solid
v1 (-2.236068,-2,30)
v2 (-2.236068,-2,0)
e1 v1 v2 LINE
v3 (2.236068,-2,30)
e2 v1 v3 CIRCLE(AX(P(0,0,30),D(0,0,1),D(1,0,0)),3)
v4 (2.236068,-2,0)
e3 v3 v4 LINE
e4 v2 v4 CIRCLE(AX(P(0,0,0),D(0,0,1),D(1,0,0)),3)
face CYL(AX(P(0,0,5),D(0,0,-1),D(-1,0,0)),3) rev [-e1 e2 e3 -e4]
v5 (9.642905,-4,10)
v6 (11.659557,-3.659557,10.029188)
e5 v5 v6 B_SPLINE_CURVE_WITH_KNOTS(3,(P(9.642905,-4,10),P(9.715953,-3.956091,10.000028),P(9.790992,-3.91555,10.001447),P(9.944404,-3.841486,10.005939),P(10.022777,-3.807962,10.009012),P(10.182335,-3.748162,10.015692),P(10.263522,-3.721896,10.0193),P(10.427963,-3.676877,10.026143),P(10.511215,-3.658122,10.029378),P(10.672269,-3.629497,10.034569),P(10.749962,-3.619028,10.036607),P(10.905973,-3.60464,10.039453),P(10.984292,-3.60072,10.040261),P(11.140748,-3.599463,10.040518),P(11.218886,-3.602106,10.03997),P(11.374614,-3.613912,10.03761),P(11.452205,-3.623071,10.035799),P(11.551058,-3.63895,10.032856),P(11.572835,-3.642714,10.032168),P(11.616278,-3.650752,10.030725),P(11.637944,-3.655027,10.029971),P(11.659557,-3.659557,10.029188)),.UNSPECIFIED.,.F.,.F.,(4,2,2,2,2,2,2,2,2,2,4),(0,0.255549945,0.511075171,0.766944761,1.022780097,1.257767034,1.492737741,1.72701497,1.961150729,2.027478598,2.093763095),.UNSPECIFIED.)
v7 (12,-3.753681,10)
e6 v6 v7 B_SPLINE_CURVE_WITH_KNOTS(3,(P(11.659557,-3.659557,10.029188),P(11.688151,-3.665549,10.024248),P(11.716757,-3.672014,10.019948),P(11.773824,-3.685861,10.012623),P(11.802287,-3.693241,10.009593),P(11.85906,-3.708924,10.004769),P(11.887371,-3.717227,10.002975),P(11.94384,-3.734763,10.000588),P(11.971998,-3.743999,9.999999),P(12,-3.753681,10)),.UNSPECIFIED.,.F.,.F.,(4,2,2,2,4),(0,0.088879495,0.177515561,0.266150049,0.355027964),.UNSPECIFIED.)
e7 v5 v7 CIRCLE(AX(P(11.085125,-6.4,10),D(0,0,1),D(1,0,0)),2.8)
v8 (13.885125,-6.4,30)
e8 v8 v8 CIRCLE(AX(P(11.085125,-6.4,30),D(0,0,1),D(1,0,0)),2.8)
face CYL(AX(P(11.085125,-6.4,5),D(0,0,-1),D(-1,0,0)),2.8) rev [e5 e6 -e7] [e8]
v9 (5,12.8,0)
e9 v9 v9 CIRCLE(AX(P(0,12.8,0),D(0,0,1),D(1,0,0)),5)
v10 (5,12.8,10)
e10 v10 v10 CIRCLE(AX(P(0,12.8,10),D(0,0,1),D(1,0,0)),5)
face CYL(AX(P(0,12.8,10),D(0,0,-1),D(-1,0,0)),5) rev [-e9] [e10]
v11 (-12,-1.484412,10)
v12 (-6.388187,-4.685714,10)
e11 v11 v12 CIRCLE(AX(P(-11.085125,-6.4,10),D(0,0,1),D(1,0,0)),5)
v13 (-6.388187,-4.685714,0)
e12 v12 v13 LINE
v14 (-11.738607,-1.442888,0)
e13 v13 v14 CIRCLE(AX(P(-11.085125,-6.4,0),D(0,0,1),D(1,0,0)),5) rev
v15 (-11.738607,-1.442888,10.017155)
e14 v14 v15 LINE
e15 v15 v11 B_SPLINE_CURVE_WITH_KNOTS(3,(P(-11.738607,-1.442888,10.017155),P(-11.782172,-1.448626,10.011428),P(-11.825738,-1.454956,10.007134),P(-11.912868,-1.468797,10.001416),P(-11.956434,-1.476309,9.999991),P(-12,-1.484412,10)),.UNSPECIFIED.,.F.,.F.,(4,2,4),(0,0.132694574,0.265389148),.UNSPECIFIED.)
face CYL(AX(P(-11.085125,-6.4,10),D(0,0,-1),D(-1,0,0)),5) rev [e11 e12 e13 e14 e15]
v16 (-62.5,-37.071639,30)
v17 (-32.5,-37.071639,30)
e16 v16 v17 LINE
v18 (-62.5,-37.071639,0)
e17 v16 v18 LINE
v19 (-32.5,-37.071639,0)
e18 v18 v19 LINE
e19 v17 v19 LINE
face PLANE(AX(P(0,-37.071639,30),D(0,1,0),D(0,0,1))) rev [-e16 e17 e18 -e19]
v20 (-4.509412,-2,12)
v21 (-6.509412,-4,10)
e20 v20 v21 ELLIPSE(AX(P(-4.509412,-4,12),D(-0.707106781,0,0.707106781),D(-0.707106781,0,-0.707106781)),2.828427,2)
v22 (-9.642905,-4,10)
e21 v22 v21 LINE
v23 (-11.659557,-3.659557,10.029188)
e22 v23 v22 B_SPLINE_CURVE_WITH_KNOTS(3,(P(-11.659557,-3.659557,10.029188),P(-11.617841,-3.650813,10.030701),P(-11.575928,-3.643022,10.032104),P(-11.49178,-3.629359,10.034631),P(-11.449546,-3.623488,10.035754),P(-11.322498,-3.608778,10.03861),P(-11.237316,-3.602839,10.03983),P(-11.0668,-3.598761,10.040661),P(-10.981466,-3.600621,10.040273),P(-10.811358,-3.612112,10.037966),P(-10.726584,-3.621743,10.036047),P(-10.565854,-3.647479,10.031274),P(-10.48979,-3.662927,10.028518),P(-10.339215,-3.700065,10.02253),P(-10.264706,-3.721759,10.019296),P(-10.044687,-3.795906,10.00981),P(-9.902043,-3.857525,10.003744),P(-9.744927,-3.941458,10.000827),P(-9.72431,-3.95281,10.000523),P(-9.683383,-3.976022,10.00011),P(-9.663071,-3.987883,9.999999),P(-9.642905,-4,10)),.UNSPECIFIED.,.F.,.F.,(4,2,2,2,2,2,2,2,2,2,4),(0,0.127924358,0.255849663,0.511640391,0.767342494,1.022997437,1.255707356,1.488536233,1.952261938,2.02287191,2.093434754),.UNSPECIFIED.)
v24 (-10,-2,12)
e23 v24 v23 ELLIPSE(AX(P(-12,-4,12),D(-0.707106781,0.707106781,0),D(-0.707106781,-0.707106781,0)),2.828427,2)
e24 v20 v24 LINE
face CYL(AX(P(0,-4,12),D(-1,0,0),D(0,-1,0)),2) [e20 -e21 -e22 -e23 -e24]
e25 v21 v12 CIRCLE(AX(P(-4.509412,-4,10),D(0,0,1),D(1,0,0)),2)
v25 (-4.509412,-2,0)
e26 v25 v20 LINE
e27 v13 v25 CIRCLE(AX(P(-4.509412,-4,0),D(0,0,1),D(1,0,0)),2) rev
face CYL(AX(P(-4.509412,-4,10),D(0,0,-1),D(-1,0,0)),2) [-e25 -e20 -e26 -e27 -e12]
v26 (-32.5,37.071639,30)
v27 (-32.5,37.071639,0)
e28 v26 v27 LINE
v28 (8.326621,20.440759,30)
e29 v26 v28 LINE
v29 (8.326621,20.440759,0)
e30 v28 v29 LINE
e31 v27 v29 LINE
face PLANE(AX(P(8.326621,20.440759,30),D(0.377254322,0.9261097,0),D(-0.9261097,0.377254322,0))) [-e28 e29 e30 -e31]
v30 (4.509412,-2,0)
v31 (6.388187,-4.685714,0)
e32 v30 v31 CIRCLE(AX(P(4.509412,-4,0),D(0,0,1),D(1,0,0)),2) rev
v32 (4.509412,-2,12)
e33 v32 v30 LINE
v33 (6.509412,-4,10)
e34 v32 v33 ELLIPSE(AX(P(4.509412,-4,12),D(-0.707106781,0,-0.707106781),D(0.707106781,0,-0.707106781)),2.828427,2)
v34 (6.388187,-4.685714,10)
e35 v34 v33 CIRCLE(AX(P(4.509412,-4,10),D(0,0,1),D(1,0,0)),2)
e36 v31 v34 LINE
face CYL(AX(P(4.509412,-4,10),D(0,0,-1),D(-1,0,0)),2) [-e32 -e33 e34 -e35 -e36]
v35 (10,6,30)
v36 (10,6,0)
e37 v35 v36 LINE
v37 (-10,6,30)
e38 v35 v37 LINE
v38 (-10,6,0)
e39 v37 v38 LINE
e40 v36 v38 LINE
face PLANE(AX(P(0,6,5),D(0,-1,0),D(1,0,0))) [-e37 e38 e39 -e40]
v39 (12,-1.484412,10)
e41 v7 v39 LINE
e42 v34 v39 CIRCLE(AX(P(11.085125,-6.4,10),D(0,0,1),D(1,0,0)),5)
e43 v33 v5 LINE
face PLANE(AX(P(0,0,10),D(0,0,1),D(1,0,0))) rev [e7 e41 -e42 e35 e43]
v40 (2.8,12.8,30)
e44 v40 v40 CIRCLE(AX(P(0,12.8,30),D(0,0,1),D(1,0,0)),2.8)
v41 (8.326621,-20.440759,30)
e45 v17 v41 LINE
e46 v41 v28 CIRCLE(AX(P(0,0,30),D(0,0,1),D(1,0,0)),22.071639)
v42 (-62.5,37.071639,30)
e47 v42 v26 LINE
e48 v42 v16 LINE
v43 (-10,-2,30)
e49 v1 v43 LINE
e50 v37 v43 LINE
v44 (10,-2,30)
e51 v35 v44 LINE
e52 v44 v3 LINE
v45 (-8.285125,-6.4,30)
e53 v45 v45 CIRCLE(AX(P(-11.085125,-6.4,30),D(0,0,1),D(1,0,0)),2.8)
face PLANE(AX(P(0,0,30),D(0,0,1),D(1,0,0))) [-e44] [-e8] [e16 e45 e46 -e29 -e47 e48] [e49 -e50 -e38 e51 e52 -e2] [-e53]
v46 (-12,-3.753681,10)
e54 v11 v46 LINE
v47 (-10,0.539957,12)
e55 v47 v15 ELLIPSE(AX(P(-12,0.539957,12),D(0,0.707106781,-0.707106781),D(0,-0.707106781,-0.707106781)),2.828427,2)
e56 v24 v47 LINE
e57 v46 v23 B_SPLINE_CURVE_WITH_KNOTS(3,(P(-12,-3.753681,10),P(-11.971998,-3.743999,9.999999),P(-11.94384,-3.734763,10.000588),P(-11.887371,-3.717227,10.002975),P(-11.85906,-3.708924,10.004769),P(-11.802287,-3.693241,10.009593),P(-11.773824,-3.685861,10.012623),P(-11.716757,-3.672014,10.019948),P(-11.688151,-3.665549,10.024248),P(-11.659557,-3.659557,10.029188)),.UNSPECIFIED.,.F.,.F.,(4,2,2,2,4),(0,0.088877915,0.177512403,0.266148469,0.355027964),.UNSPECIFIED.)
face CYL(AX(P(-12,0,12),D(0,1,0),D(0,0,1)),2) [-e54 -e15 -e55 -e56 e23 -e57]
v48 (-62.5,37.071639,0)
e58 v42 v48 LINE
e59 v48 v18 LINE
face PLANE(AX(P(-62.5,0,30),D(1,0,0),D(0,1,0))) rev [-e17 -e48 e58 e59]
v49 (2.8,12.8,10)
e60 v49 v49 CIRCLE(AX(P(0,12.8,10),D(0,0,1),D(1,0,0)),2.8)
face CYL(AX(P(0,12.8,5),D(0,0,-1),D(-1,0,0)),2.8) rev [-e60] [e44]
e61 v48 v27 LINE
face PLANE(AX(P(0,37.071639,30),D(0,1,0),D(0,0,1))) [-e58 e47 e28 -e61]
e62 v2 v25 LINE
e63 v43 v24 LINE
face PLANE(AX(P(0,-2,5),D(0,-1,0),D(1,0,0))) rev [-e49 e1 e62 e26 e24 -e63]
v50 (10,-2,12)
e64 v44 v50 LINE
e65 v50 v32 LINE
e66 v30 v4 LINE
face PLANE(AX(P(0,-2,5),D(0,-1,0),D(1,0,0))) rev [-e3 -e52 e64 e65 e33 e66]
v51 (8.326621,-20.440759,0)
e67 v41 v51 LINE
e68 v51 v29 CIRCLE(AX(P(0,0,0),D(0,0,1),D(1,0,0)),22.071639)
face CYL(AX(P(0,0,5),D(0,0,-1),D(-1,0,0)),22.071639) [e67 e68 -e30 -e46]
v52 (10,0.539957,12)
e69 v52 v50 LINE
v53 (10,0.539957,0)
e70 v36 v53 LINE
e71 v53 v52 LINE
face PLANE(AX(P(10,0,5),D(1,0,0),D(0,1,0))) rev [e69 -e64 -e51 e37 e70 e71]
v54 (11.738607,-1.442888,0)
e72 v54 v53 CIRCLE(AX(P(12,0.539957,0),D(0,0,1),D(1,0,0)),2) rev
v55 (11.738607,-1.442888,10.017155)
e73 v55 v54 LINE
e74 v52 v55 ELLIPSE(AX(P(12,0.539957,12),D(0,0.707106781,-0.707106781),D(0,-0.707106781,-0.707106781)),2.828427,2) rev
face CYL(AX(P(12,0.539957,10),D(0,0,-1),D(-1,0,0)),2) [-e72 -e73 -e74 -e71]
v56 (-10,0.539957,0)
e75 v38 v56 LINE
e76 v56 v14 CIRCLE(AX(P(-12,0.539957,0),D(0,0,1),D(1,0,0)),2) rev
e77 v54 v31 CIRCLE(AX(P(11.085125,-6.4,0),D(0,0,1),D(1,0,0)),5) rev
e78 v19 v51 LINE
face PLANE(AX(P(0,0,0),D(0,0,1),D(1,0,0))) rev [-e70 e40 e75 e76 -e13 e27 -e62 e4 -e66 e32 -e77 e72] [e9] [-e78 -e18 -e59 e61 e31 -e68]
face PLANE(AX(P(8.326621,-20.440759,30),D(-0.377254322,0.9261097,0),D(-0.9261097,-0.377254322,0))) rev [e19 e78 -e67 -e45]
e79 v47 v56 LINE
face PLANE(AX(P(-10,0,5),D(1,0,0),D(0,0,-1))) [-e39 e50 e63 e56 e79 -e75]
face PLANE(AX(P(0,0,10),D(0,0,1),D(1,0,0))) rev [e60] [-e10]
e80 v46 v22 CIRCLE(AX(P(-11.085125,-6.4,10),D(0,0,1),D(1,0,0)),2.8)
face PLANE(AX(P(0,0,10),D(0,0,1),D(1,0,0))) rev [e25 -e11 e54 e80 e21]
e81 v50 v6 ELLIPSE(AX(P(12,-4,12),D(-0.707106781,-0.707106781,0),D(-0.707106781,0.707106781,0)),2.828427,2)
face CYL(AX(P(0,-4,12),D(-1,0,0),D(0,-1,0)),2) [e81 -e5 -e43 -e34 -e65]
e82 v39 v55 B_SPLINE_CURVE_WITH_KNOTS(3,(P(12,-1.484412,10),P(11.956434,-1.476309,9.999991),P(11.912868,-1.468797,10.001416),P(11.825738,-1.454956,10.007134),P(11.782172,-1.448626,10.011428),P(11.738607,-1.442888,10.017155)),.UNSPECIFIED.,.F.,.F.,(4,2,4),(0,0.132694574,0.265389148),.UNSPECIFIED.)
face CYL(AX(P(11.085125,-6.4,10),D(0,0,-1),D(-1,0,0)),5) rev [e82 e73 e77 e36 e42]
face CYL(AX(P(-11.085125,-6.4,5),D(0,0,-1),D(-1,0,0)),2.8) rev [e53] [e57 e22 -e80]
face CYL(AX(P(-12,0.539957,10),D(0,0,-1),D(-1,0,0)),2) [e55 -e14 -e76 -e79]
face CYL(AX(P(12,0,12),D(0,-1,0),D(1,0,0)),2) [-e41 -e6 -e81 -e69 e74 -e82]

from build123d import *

# Parameters (mm, degrees)
SKETCH_1_R          = 22.07163906423819
SKETCH_1_R_2        = 2.8
SKETCH_1_R_3        = 2.8000000000000003
EXTRUDE_1_DEPTH     = 5
SKETCH_2_R          = 22.07163906423819
SKETCH_2_R_2        = 2.8000000000000003
SKETCH_2_R_3        = 2.8
EXTRUDE_2_DEPTH     = 30
SKETCH_3_R          = 4.999999999999998
SKETCH_3_R_2        = 2.8000000000000003
SKETCH_3_R_3        = 5.000000000000001
SKETCH_3_R_4        = 2.8
SKETCH_3_R_5        = 5
CUT_EXTRUDE_1_DEPTH = 10
FILLET_2_R          = 2
FILLET_3_R          = 2


with BuildPart() as part:
    # 스케치1 → 보스-돌출1 (new body)
    with BuildSketch(Plane.XY):
        Circle(SKETCH_1_R)
        with Locations((0, 12.8)):
            Circle(SKETCH_1_R_2, mode=Mode.SUBTRACT)
        with Locations((-11.085125168440811, -6.400000000000006)):
            Circle(SKETCH_1_R_3, mode=Mode.SUBTRACT)
        with Locations((11.085125168440817, -6.399999999999997)):
            Circle(SKETCH_1_R_3, mode=Mode.SUBTRACT)
        with BuildLine():
            Line((-9.999999999999998, 5.9999999999999964), (10.000000000000002, 6.0000000000000036))
            Line((10.000000000000002, 6.0000000000000036), (10.000000000000004, -1.9999999999999964))
            Line((10.000000000000004, -1.9999999999999973), (2.236067977499654, -1.9999999999999998))
            ThreePointArc((2.236067977499691, -2.00000000000011), (-3.785e-14, -3), (-2.2360679774997423, -2.000000000000053))
            Line((-2.236067977499724, -2.0000000000000013), (-9.999999999999996, -2.0000000000000036))
            Line((-9.999999999999996, -2.0000000000000036), (-9.999999999999996, 5.9999999999999964))
        make_face(mode=Mode.SUBTRACT)
    extrude(amount=EXTRUDE_1_DEPTH)

    # 스케치2 → 보스-돌출2 (add)
    # profile 1 of 4: a face of its own
    with BuildSketch(Plane.XY):
        with BuildLine():
            ThreePointArc((8.32662123293451, -20.440759032512698), (4.242416494011306, -21.660082023698482), (-4.05e-15, -22.07163906423819))
            Line((0, -22.07163906423819), (-62.49999999999999, -22.07163906423819))
            Line((-62.49999999999999, -22.07163906423819), (-62.499999999999986, -37.07163906423819))
            Line((-62.499999999999986, -37.07163906423819), (-32.5, -37.07163906423819))
            Line((-32.5, -37.07163906423819), (8.326621232934514, -20.440759032512695))
        make_face()
    # profile 2 of 4: a face of its own
    with BuildSketch(Plane.XY):
        with BuildLine():
            ThreePointArc((-4.05e-15, -22.07163906423819), (-22.07163906423819, 2.7e-15), (1.35e-15, 22.07163906423819))
            Line((0, 22.07163906423819), (-62.49999999999999, 22.07163906423819))
            Line((-62.49999999999999, 22.07163906423819), (-62.49999999999999, -22.07163906423819))
            Line((-62.49999999999999, -22.07163906423819), (0, -22.07163906423819))
        make_face()
    # profile 3 of 4: a face of its own
    with BuildSketch(Plane.XY):
        Circle(SKETCH_2_R)
        with Locations((11.085125168440817, -6.399999999999997)):
            Circle(SKETCH_2_R_2, mode=Mode.SUBTRACT)
        with Locations((-11.085125168440811, -6.400000000000006)):
            Circle(SKETCH_2_R_2, mode=Mode.SUBTRACT)
        with Locations((0, 12.8)):
            Circle(SKETCH_2_R_3, mode=Mode.SUBTRACT)
        with BuildLine():
            ThreePointArc((-2.23606797749979, -2.0000000000000013), (8.5e-16, -3.000000000000001), (2.2360679774997907, -1.9999999999999996))
            Line((2.2360679774997907, -1.9999999999999996), (10.000000000000004, -1.9999999999999973))
            Line((10.000000000000004, -1.9999999999999973), (10.000000000000002, 6.0000000000000036))
            Line((10.000000000000002, 6.0000000000000036), (-9.999999999999996, 5.9999999999999964))
            Line((-9.999999999999996, 5.9999999999999964), (-9.999999999999996, -2.0000000000000036))
            Line((-9.999999999999996, -2.0000000000000036), (-2.23606797749979, -2.0000000000000013))
        make_face(mode=Mode.SUBTRACT)
    # profile 4 of 4: a face of its own
    with BuildSketch(Plane.XY):
        with BuildLine():
            Line((-62.49999999999999, 22.07163906423819), (0, 22.07163906423819))
            ThreePointArc((1.35e-15, 22.07163906423819), (4.242416494011311, 21.660082023698482), (8.326621232934516, 20.440759032512698))
            Line((8.326621232934514, 20.440759032512695), (-32.500000000000014, 37.07163906423818))
            Line((-32.500000000000014, 37.07163906423818), (-62.5, 37.07163906423818))
            Line((-62.5, 37.07163906423818), (-62.49999999999999, 22.07163906423819))
        make_face()
    extrude(amount=EXTRUDE_2_DEPTH)

    # 스케치3 → 컷-돌출1 (cut)
    # profile 1 of 3: a face of its own
    with BuildSketch(Plane.XY):
        with Locations((11.085125168440817, -6.399999999999997)):
            Circle(SKETCH_3_R)
        with Locations((11.085125168440817, -6.399999999999997)):
            Circle(SKETCH_3_R_2, mode=Mode.SUBTRACT)
    # profile 2 of 3: a face of its own
    with BuildSketch(Plane.XY):
        with Locations((0, 12.8)):
            Circle(SKETCH_3_R_3)
        with Locations((0, 12.8)):
            Circle(SKETCH_3_R_4, mode=Mode.SUBTRACT)
    # profile 3 of 3: a face of its own
    with BuildSketch(Plane.XY):
        with Locations((-11.085125168440811, -6.400000000000006)):
            Circle(SKETCH_3_R_5)
        with Locations((-11.085125168440811, -6.400000000000006)):
            Circle(SKETCH_3_R_2, mode=Mode.SUBTRACT)
    extrude(amount=CUT_EXTRUDE_1_DEPTH, mode=Mode.SUBTRACT)

    # 필렛2
    # the kernel refuses this fillet: 2 mm, written as the material it takes off along each edge
    with BuildSketch(Plane(origin=(10.000000000000004, -1.9999999999999971, 10), x_dir=(0, -1.1e-16, 1), z_dir=(-1, -3.1e-16, 0))) as fillet_2_piece_1_section:
        with BuildLine():
            CenterArc((FILLET_2_R, -FILLET_2_R), FILLET_2_R, 90, 90)
            Line((2.2e-16, -FILLET_2_R), (-FILLET_2_R * 0.02, -FILLET_2_R))
            Line((-FILLET_2_R * 0.02, -FILLET_2_R), (-FILLET_2_R * 0.02, FILLET_2_R * 0.02))
            Line((-FILLET_2_R * 0.02, FILLET_2_R * 0.02), (FILLET_2_R, FILLET_2_R * 0.02))
            Line((FILLET_2_R, FILLET_2_R * 0.02), (FILLET_2_R, 0))
        make_face()
    fillet_2_piece_1 = extrude(amount=6.289743248966767, mode=Mode.PRIVATE)
    fillet_2_piece_1 = fillet_2_piece_1 & Plane(origin=(11.085125168440817, -6.399999999999997, 10.38158038345629), x_dir=(1, 0, 0), z_dir=(0, 0, -1)) * Cylinder(4.999999999999998, 21, mode=Mode.PRIVATE)
    add(fillet_2_piece_1, mode=Mode.SUBTRACT)
    with BuildSketch(Plane(origin=(10.000000000000002, 3.4808301925816174, 10), x_dir=(1, 2.2e-16, 0), z_dir=(2.2e-16, -1, 0))) as fillet_2_piece_2_section:
        with BuildLine():
            CenterArc((FILLET_2_R, FILLET_2_R), FILLET_2_R, 180, 90)
            Line((0, FILLET_2_R), (-FILLET_2_R * 0.02, FILLET_2_R))
            Line((-FILLET_2_R * 0.02, FILLET_2_R), (-FILLET_2_R * 0.02, -FILLET_2_R * 0.02))
            Line((-FILLET_2_R * 0.02, -FILLET_2_R * 0.02), (FILLET_2_R, -FILLET_2_R * 0.02))
            Line((FILLET_2_R, -FILLET_2_R * 0.02), (FILLET_2_R, 0))
        make_face()
    fillet_2_piece_2 = extrude(amount=5.480830192581614, mode=Mode.PRIVATE)
    fillet_2_piece_2 = fillet_2_piece_2 & Plane(origin=(11.085125168440817, -6.399999999999997, 10.432374541535312), x_dir=(1, 0, 0), z_dir=(0, 0, -1)) * Cylinder(4.999999999999998, 19, mode=Mode.PRIVATE)
    add(fillet_2_piece_2, mode=Mode.SUBTRACT)
    with BuildSketch(Plane(origin=(10.000000000000004, -1.5191698074183817, 10), x_dir=(0.9990388643678791, 0.04383317787405267, 0), z_dir=(0, 0, -1))) as fillet_2_piece_3:
        with BuildLine():
            CenterArc((2.088335803131926, -1.9694814149172293), FILLET_2_R, 100.02209773137437, 82.49016328956924)
            Line((0.09025807439617, -2.057147770665381), (0.05029651982145572, -2.058901097780344))
            Line((0.05029651982145572, -2.058901097780344), (-0.03996155457471431, -0.00175332711496207))
            Line((-0.03996155457471431, -0.00175332711496207), (0.0069611193437724, 0.03938962829834457))
            ThreePointArc((0.0069611193437724, 0.03938962829834457), (0.8701399179716347, -0.03629646270692696), (1.733318716599498, 0.0393896282983446))
            Line((1.733318716599498, 0.0393896282983446), (1.7402798359432718, 0))
        make_face()
    extrude(amount=10, mode=Mode.SUBTRACT)
    with BuildSketch(Plane(origin=(8.710256751033235, -1.9999999999999971, 10), x_dir=(-1, -4.8e-16, 0), z_dir=(0, 0, -1))) as fillet_2_piece_4:
        with BuildLine():
            CenterArc((4.200844471701857, -1.9999999999999998), FILLET_2_R, 90, 110.05104256650594)
            Line((2.3220693605277325, -2.685714285714287), (2.28449385830425, -2.699428571428572))
            ThreePointArc((2.28449385830425, -2.699428571428572), (1.377184031846625, -1.1559743499710886), (-0.01899894733926109, -0.0351999999999999))
            Line((-0.01899894733926109, -0.0351999999999999), (-2e-17, 0.04000000000000004))
            Line((-2e-17, 0.04000000000000004), (4.200844471701857, 0.04000000000000004))
            Line((4.200844471701857, 0.04000000000000004), (4.200844471701857, 0))
        make_face()
    extrude(amount=10, mode=Mode.SUBTRACT)
    with BuildSketch(Plane(origin=(15.000000000000004, -1.9999999999999958, 10), x_dir=(0, 1.1e-16, 1), z_dir=(-1, -3.1e-16, 0))) as fillet_2_piece_5a_section:
        with BuildLine():
            CenterArc((FILLET_2_R, -FILLET_2_R), FILLET_2_R, 90, 90)
            Line((-2.2e-16, -FILLET_2_R), (-FILLET_2_R * 0.02, -FILLET_2_R))
            Line((-FILLET_2_R * 0.02, -FILLET_2_R), (-FILLET_2_R * 0.02, FILLET_2_R * 0.02))
            Line((-FILLET_2_R * 0.02, FILLET_2_R * 0.02), (FILLET_2_R, FILLET_2_R * 0.02))
            Line((FILLET_2_R, FILLET_2_R * 0.02), (FILLET_2_R, 0))
        make_face()
    fillet_2_piece_5a = extrude(amount=11.289743248966767, mode=Mode.PRIVATE)
    fillet_2_piece_5a = split(fillet_2_piece_5a, bisect_by=Plane(origin=(10.000000000000004, -2.502531092165931, 10.420578352743194), z_dir=(1, 2.2e-16, 0)), keep=Keep.TOP, mode=Mode.PRIVATE)
    fillet_2_piece_5a = fillet_2_piece_5a & Plane(origin=(11.085125168440817, -6.399999999999997, 10.420578352743194), x_dir=(1, 0, 0), z_dir=(0, 0, -1)) * Cylinder(4.999999999999998, 31, mode=Mode.PRIVATE)
    with BuildSketch(Plane(origin=(10.000000000000002, 3.4808301925816174, 10), x_dir=(1, 2.2e-16, 0), z_dir=(2.2e-16, -1, 0))) as fillet_2_piece_5b_section:
        with BuildLine():
            CenterArc((FILLET_2_R, FILLET_2_R), FILLET_2_R, 180, 90)
            Line((0, FILLET_2_R), (-FILLET_2_R * 0.02, FILLET_2_R))
            Line((-FILLET_2_R * 0.02, FILLET_2_R), (-FILLET_2_R * 0.02, -FILLET_2_R * 0.02))
            Line((-FILLET_2_R * 0.02, -FILLET_2_R * 0.02), (FILLET_2_R, -FILLET_2_R * 0.02))
            Line((FILLET_2_R, -FILLET_2_R * 0.02), (FILLET_2_R, 0))
        make_face()
    fillet_2_piece_5b = extrude(amount=10.480830192581614, mode=Mode.PRIVATE)
    fillet_2_piece_5b = split(fillet_2_piece_5b, bisect_by=Plane(origin=(10.452790228533653, -1.9999999999999971, 10.452790228533651), z_dir=(3.1e-16, -1, 0)), keep=Keep.TOP, mode=Mode.PRIVATE)
    fillet_2_piece_5 = fillet_2_piece_5a & fillet_2_piece_5b
    add(fillet_2_piece_5, mode=Mode.SUBTRACT)
    with BuildSketch(Plane(origin=(10.000000000000004, -1.9999999999999971, 10), x_dir=(0, -1.1e-16, 1), z_dir=(-1, -3.1e-16, 0))) as fillet_2_piece_6a_section:
        with BuildLine():
            CenterArc((FILLET_2_R, -FILLET_2_R), FILLET_2_R, 90, 90)
            Line((2.2e-16, -FILLET_2_R), (-FILLET_2_R * 0.02, -FILLET_2_R))
            Line((-FILLET_2_R * 0.02, -FILLET_2_R), (-FILLET_2_R * 0.02, FILLET_2_R * 0.02))
            Line((-FILLET_2_R * 0.02, FILLET_2_R * 0.02), (FILLET_2_R, FILLET_2_R * 0.02))
            Line((FILLET_2_R, FILLET_2_R * 0.02), (FILLET_2_R, 0))
        make_face()
    fillet_2_piece_6a = extrude(amount=6.289743248966767, mode=Mode.PRIVATE)
    fillet_2_piece_6a = fillet_2_piece_6a - Plane(origin=(11.085125168440817, -6.399999999999997, 10.483868108207538), x_dir=(1, 0, 0), z_dir=(0, 0, -1)) * Cylinder(4.999999999999998, 21, mode=Mode.PRIVATE)
    with BuildSketch(Plane(origin=(8.710256751033235, -1.9999999999999978, 20.50211117925464), x_dir=(-1, -3.2e-16, 0), z_dir=(0, 0, -1))) as fillet_2_piece_6b_section:
        with BuildLine():
            CenterArc((4.200844471701857, -2), FILLET_2_R, 90, 110.05104256650594)
            Line((2.322069360527732, -2.6857142857142864), (2.2844938583042493, -2.6994285714285717))
            ThreePointArc((2.2844938583042493, -2.6994285714285717), (1.377184031846625, -1.1559743499710882), (-0.0189989473392611, -0.03520000000000013))
            Line((-0.0189989473392611, -0.03520000000000013), (-1e-17, 0.04000000000000004))
            Line((-1e-17, 0.04000000000000004), (4.200844471701857, 0.04000000000000004))
            Line((4.200844471701857, 0.04000000000000004), (4.200844471701857, 0))
        make_face()
    fillet_2_piece_6b = extrude(amount=20.50211117925464, mode=Mode.PRIVATE)
    fillet_2_piece_6b = split(fillet_2_piece_6b, bisect_by=Plane(origin=(6.847484840256227, -2.622929884274402, 10), z_dir=(0, 0, 1)), keep=Keep.TOP, mode=Mode.PRIVATE)
    fillet_2_piece_6 = fillet_2_piece_6a & fillet_2_piece_6b
    add(fillet_2_piece_6, mode=Mode.SUBTRACT)
    with BuildSketch(Plane(origin=(10.000000000000004, -1.5191698074183826, 15.147817177180084), x_dir=(0.9990388643678791, 0.043833177874053185, 0), z_dir=(0, 0, -1))) as fillet_2_piece_7a_section:
        with BuildLine():
            CenterArc((2.0883358031319275, -1.969481414917229), FILLET_2_R, 100.02209773137442, 82.49016328956924)
            Line((0.09025807439617109, -2.057147770665382), (0.05029651982145682, -2.058901097780345))
            Line((0.05029651982145682, -2.058901097780345), (-0.03996155457471431, -0.00175332711496209))
            Line((-0.03996155457471431, -0.00175332711496209), (0.00696111934377238, 0.03938962829834458))
            ThreePointArc((0.00696111934377238, 0.03938962829834458), (0.8701399179716348, -0.03629646270692741), (1.7333187165994983, 0.0393896282983446))
            Line((1.7333187165994983, 0.0393896282983446), (1.7402798359432718, 0))
        make_face()
    fillet_2_piece_7a = extrude(amount=15.147817177180084, mode=Mode.PRIVATE)
    fillet_2_piece_7a = split(fillet_2_piece_7a, bisect_by=Plane(origin=(10.391792532024441, -0.9771675464374212, 10), z_dir=(0, 0, 1)), keep=Keep.TOP, mode=Mode.PRIVATE)
    with BuildSketch(Plane(origin=(10.000000000000002, 3.4808301925816174, 10), x_dir=(1, 2.2e-16, 0), z_dir=(2.2e-16, -1, 0))) as fillet_2_piece_7b_section:
        with BuildLine():
            CenterArc((FILLET_2_R, FILLET_2_R), FILLET_2_R, 180, 90)
            Line((0, FILLET_2_R), (-FILLET_2_R * 0.02, FILLET_2_R))
            Line((-FILLET_2_R * 0.02, FILLET_2_R), (-FILLET_2_R * 0.02, -FILLET_2_R * 0.02))
            Line((-FILLET_2_R * 0.02, -FILLET_2_R * 0.02), (FILLET_2_R, -FILLET_2_R * 0.02))
            Line((FILLET_2_R, -FILLET_2_R * 0.02), (FILLET_2_R, 0))
        make_face()
    fillet_2_piece_7b = extrude(amount=5.480830192581614, mode=Mode.PRIVATE)
    fillet_2_piece_7b = fillet_2_piece_7b - Plane(origin=(11.085125168440817, -6.399999999999997, 10.455025581015375), x_dir=(1, 0, 0), z_dir=(0, 0, -1)) * Cylinder(4.999999999999998, 19, mode=Mode.PRIVATE)
    fillet_2_piece_7 = fillet_2_piece_7a & fillet_2_piece_7b
    add(fillet_2_piece_7, mode=Mode.SUBTRACT)

    # 필렛3
    # the kernel refuses this fillet: 2 mm, written as the material it takes off along each edge
    with BuildSketch(Plane(origin=(-3.7102567510332314, -2.0000000000000018, 10), x_dir=(2.9e-16, -1, 0), z_dir=(-1, -2.9e-16, 0))) as fillet_3_piece_1_section:
        with BuildLine():
            CenterArc((FILLET_3_R, FILLET_3_R), FILLET_3_R, 180, 90)
            Line((0, FILLET_3_R), (-FILLET_3_R * 0.02, FILLET_3_R))
            Line((-FILLET_3_R * 0.02, FILLET_3_R), (-FILLET_3_R * 0.02, -FILLET_3_R * 0.02))
            Line((-FILLET_3_R * 0.02, -FILLET_3_R * 0.02), (FILLET_3_R, -FILLET_3_R * 0.02))
            Line((FILLET_3_R, -FILLET_3_R * 0.02), (FILLET_3_R, 0))
        make_face()
    fillet_3_piece_1 = extrude(amount=6.289743248966765, mode=Mode.PRIVATE)
    fillet_3_piece_1 = fillet_3_piece_1 & Plane(origin=(-11.085125168440811, -6.400000000000006, 10.381589776763924), x_dir=(1, 0, 0), z_dir=(0, 0, -1)) * Cylinder(5, 21, mode=Mode.PRIVATE)
    add(fillet_3_piece_1, mode=Mode.SUBTRACT)
    with BuildSketch(Plane(origin=(-9.999999999999996, -1.5191698074183897, 10), x_dir=(0, 1, 0), z_dir=(0, 0, -1))) as fillet_3_piece_2:
        with BuildLine():
            CenterArc((2.05912687087204, -2), FILLET_3_R, 90, 82.49016328956796)
            Line((0.07628199559958171, -1.7386071909830925), (0.0366250980941325, -1.7333793348027537))
            ThreePointArc((0.0366250980941325, -1.7333793348027537), (0.07440257468306455, -0.8677126061855152), (-0.03904664154065296, -0.00868100134752581))
            Line((-0.03904664154065296, -0.00868100134752581), (0, 0.03999999999999915))
            Line((0, 0.03999999999999915), (2.05912687087204, 0.03999999999999915))
            Line((2.05912687087204, 0.03999999999999915), (2.05912687087204, 0))
        make_face()
    extrude(amount=10, mode=Mode.SUBTRACT)
    with BuildSketch(Plane(origin=(-8.710256751033231, -2.0000000000000036, 10), x_dir=(0.6540374294413133, -0.7564621873496382, 0), z_dir=(0, 0, -1))) as fillet_3_piece_3:
        with BuildLine():
            CenterArc((4.260433894453909, -1.8697051388965966), FILLET_3_R, 110.79566042858305, 110.05104256650594)
            Line((2.747509519754633, -3.1777799977792234), (2.7172510322606476, -3.203941494956876))
            Line((2.7172510322606476, -3.203941494956876), (-0.03025848749398555, -0.02616149717765255))
            Line((-0.03025848749398555, -0.02616149717765255), (0.01420144631484614, 0.03739410277793235))
            ThreePointArc((0.01420144631484614, 0.03739410277793235), (1.775180789355795, -0.28573715275850864), (3.5361601323967444, 0.03739410277793173))
            Line((3.5361601323967444, 0.03739410277793173), (3.550361578711591, 3e-17))
        make_face()
    extrude(amount=10, mode=Mode.SUBTRACT)
    with BuildSketch(Plane(origin=(-9.999999999999996, -2.0000000000000036, 10), x_dir=(0, 0, 1), z_dir=(0, 1, 0))) as fillet_3_piece_4_section:
        with BuildLine():
            CenterArc((FILLET_3_R, -FILLET_3_R), FILLET_3_R, 90, 90)
            Line((0, -FILLET_3_R), (-FILLET_3_R * 0.02, -FILLET_3_R))
            Line((-FILLET_3_R * 0.02, -FILLET_3_R), (-FILLET_3_R * 0.02, FILLET_3_R * 0.02))
            Line((-FILLET_3_R * 0.02, FILLET_3_R * 0.02), (FILLET_3_R, FILLET_3_R * 0.02))
            Line((FILLET_3_R, FILLET_3_R * 0.02), (FILLET_3_R, 0))
        make_face()
    fillet_3_piece_4 = extrude(amount=5.480830192581614, mode=Mode.PRIVATE)
    fillet_3_piece_4 = fillet_3_piece_4 & Plane(origin=(-11.085125168440811, -6.400000000000006, 10.43237487449388), x_dir=(1, 0, 0), z_dir=(0, 0, -1)) * Cylinder(5, 19, mode=Mode.PRIVATE)
    add(fillet_3_piece_4, mode=Mode.SUBTRACT)
    with BuildSketch(Plane(origin=(-8.710256751033231, -2.0000000000000036, 20.50211117925464), x_dir=(0.6540374294413133, -0.7564621873496382, 0), z_dir=(0, 0, -1))) as fillet_3_piece_5a_section:
        with BuildLine():
            CenterArc((4.260433894453909, -1.8697051388965966), FILLET_3_R, 110.79566042858305, 110.05104256650594)
            Line((2.747509519754633, -3.1777799977792234), (2.7172510322606476, -3.203941494956876))
            Line((2.7172510322606476, -3.203941494956876), (-0.03025848749398555, -0.02616149717765255))
            Line((-0.03025848749398555, -0.02616149717765255), (0.01420144631484614, 0.03739410277793235))
            ThreePointArc((0.01420144631484614, 0.03739410277793235), (1.775180789355795, -0.28573715275850864), (3.5361601323967444, 0.03739410277793173))
            Line((3.5361601323967444, 0.03739410277793173), (3.550361578711591, 3e-17))
        make_face()
    fillet_3_piece_5a = extrude(amount=20.50211117925464, mode=Mode.PRIVATE)
    fillet_3_piece_5a = split(fillet_3_piece_5a, bisect_by=Plane(origin=(-6.847484840256223, -2.622929884274406, 10), z_dir=(0, 0, 1)), keep=Keep.TOP, mode=Mode.PRIVATE)
    with BuildSketch(Plane(origin=(-3.7102567510332314, -2.0000000000000018, 10), x_dir=(2.9e-16, -1, 0), z_dir=(-1, -2.9e-16, 0))) as fillet_3_piece_5b_section:
        with BuildLine():
            CenterArc((FILLET_3_R, FILLET_3_R), FILLET_3_R, 180, 90)
            Line((0, FILLET_3_R), (-FILLET_3_R * 0.02, FILLET_3_R))
            Line((-FILLET_3_R * 0.02, FILLET_3_R), (-FILLET_3_R * 0.02, -FILLET_3_R * 0.02))
            Line((-FILLET_3_R * 0.02, -FILLET_3_R * 0.02), (FILLET_3_R, -FILLET_3_R * 0.02))
            Line((FILLET_3_R, -FILLET_3_R * 0.02), (FILLET_3_R, 0))
        make_face()
    fillet_3_piece_5b = extrude(amount=6.289743248966765, mode=Mode.PRIVATE)
    fillet_3_piece_5b = fillet_3_piece_5b - Plane(origin=(-11.085125168440811, -6.400000000000006, 10.483871552130461), x_dir=(1, 0, 0), z_dir=(0, 0, -1)) * Cylinder(5, 21, mode=Mode.PRIVATE)
    fillet_3_piece_5 = fillet_3_piece_5a & fillet_3_piece_5b
    add(fillet_3_piece_5, mode=Mode.SUBTRACT)
    with BuildSketch(Plane(origin=(-9.999999999999996, -7.0000000000000036, 10), x_dir=(0, 0, 1), z_dir=(0, 1, 0))) as fillet_3_piece_6a_section:
        with BuildLine():
            CenterArc((FILLET_3_R, -FILLET_3_R), FILLET_3_R, 90, 90)
            Line((0, -FILLET_3_R), (-FILLET_3_R * 0.02, -FILLET_3_R))
            Line((-FILLET_3_R * 0.02, -FILLET_3_R), (-FILLET_3_R * 0.02, FILLET_3_R * 0.02))
            Line((-FILLET_3_R * 0.02, FILLET_3_R * 0.02), (FILLET_3_R, FILLET_3_R * 0.02))
            Line((FILLET_3_R, FILLET_3_R * 0.02), (FILLET_3_R, 0))
        make_face()
    fillet_3_piece_6a = extrude(amount=10.480830192581614, mode=Mode.PRIVATE)
    fillet_3_piece_6a = split(fillet_3_piece_6a, bisect_by=Plane(origin=(-10.45279022853365, -2.0000000000000036, 10.452790228533653), z_dir=(2.9e-16, -1, 0)), keep=Keep.TOP, mode=Mode.PRIVATE)
    with BuildSketch(Plane(origin=(-3.7102567510332314, -2.0000000000000018, 10), x_dir=(2.9e-16, -1, 0), z_dir=(-1, -2.9e-16, 0))) as fillet_3_piece_6b_section:
        with BuildLine():
            CenterArc((FILLET_3_R, FILLET_3_R), FILLET_3_R, 180, 90)
            Line((0, FILLET_3_R), (-FILLET_3_R * 0.02, FILLET_3_R))
            Line((-FILLET_3_R * 0.02, FILLET_3_R), (-FILLET_3_R * 0.02, -FILLET_3_R * 0.02))
            Line((-FILLET_3_R * 0.02, -FILLET_3_R * 0.02), (FILLET_3_R, -FILLET_3_R * 0.02))
            Line((FILLET_3_R, -FILLET_3_R * 0.02), (FILLET_3_R, 0))
        make_face()
    fillet_3_piece_6b = extrude(amount=11.289743248966765, mode=Mode.PRIVATE)
    fillet_3_piece_6b = split(fillet_3_piece_6b, bisect_by=Plane(origin=(-9.999999999999996, -2.5025307306861846, 10.420575876656605), z_dir=(-1, 0, 0)), keep=Keep.TOP, mode=Mode.PRIVATE)
    fillet_3_piece_6b = fillet_3_piece_6b & Plane(origin=(-11.085125168440811, -6.400000000000006, 10.420575876656605), x_dir=(1, 0, 0), z_dir=(0, 0, -1)) * Cylinder(5, 31, mode=Mode.PRIVATE)
    fillet_3_piece_6 = fillet_3_piece_6a & fillet_3_piece_6b
    add(fillet_3_piece_6, mode=Mode.SUBTRACT)
    with BuildSketch(Plane(origin=(-9.999999999999996, -2.0000000000000036, 10), x_dir=(0, 0, 1), z_dir=(0, 1, 0))) as fillet_3_piece_7a_section:
        with BuildLine():
            CenterArc((FILLET_3_R, -FILLET_3_R), FILLET_3_R, 90, 90)
            Line((0, -FILLET_3_R), (-FILLET_3_R * 0.02, -FILLET_3_R))
            Line((-FILLET_3_R * 0.02, -FILLET_3_R), (-FILLET_3_R * 0.02, FILLET_3_R * 0.02))
            Line((-FILLET_3_R * 0.02, FILLET_3_R * 0.02), (FILLET_3_R, FILLET_3_R * 0.02))
            Line((FILLET_3_R, FILLET_3_R * 0.02), (FILLET_3_R, 0))
        make_face()
    fillet_3_piece_7a = extrude(amount=5.480830192581614, mode=Mode.PRIVATE)
    fillet_3_piece_7a = fillet_3_piece_7a - Plane(origin=(-11.085125168440811, -6.400000000000006, 10.455025772702653), x_dir=(1, 0, 0), z_dir=(0, 0, -1)) * Cylinder(5, 19, mode=Mode.PRIVATE)
    with BuildSketch(Plane(origin=(-9.999999999999996, -1.5191698074183897, 15.1478171771801), x_dir=(0, 1, 0), z_dir=(0, 0, -1))) as fillet_3_piece_7b_section:
        with BuildLine():
            CenterArc((2.05912687087204, -2), FILLET_3_R, 90, 82.49016328956796)
            Line((0.07628199559958171, -1.7386071909830925), (0.0366250980941325, -1.7333793348027537))
            ThreePointArc((0.0366250980941325, -1.7333793348027537), (0.07440257468306455, -0.8677126061855152), (-0.03904664154065296, -0.00868100134752581))
            Line((-0.03904664154065296, -0.00868100134752581), (0, 0.03999999999999915))
            Line((0, 0.03999999999999915), (2.05912687087204, 0.03999999999999915))
            Line((2.05912687087204, 0.03999999999999915), (2.05912687087204, 0))
        make_face()
    fillet_3_piece_7b = extrude(amount=15.1478171771801, mode=Mode.PRIVATE)
    fillet_3_piece_7b = split(fillet_3_piece_7b, bisect_by=Plane(origin=(-10.39179253202446, -0.9771675464374194, 10), z_dir=(0, 0, 1)), keep=Keep.TOP, mode=Mode.PRIVATE)
    fillet_3_piece_7 = fillet_3_piece_7a & fillet_3_piece_7b
    add(fillet_3_piece_7, mode=Mode.SUBTRACT)


solid = part.part
